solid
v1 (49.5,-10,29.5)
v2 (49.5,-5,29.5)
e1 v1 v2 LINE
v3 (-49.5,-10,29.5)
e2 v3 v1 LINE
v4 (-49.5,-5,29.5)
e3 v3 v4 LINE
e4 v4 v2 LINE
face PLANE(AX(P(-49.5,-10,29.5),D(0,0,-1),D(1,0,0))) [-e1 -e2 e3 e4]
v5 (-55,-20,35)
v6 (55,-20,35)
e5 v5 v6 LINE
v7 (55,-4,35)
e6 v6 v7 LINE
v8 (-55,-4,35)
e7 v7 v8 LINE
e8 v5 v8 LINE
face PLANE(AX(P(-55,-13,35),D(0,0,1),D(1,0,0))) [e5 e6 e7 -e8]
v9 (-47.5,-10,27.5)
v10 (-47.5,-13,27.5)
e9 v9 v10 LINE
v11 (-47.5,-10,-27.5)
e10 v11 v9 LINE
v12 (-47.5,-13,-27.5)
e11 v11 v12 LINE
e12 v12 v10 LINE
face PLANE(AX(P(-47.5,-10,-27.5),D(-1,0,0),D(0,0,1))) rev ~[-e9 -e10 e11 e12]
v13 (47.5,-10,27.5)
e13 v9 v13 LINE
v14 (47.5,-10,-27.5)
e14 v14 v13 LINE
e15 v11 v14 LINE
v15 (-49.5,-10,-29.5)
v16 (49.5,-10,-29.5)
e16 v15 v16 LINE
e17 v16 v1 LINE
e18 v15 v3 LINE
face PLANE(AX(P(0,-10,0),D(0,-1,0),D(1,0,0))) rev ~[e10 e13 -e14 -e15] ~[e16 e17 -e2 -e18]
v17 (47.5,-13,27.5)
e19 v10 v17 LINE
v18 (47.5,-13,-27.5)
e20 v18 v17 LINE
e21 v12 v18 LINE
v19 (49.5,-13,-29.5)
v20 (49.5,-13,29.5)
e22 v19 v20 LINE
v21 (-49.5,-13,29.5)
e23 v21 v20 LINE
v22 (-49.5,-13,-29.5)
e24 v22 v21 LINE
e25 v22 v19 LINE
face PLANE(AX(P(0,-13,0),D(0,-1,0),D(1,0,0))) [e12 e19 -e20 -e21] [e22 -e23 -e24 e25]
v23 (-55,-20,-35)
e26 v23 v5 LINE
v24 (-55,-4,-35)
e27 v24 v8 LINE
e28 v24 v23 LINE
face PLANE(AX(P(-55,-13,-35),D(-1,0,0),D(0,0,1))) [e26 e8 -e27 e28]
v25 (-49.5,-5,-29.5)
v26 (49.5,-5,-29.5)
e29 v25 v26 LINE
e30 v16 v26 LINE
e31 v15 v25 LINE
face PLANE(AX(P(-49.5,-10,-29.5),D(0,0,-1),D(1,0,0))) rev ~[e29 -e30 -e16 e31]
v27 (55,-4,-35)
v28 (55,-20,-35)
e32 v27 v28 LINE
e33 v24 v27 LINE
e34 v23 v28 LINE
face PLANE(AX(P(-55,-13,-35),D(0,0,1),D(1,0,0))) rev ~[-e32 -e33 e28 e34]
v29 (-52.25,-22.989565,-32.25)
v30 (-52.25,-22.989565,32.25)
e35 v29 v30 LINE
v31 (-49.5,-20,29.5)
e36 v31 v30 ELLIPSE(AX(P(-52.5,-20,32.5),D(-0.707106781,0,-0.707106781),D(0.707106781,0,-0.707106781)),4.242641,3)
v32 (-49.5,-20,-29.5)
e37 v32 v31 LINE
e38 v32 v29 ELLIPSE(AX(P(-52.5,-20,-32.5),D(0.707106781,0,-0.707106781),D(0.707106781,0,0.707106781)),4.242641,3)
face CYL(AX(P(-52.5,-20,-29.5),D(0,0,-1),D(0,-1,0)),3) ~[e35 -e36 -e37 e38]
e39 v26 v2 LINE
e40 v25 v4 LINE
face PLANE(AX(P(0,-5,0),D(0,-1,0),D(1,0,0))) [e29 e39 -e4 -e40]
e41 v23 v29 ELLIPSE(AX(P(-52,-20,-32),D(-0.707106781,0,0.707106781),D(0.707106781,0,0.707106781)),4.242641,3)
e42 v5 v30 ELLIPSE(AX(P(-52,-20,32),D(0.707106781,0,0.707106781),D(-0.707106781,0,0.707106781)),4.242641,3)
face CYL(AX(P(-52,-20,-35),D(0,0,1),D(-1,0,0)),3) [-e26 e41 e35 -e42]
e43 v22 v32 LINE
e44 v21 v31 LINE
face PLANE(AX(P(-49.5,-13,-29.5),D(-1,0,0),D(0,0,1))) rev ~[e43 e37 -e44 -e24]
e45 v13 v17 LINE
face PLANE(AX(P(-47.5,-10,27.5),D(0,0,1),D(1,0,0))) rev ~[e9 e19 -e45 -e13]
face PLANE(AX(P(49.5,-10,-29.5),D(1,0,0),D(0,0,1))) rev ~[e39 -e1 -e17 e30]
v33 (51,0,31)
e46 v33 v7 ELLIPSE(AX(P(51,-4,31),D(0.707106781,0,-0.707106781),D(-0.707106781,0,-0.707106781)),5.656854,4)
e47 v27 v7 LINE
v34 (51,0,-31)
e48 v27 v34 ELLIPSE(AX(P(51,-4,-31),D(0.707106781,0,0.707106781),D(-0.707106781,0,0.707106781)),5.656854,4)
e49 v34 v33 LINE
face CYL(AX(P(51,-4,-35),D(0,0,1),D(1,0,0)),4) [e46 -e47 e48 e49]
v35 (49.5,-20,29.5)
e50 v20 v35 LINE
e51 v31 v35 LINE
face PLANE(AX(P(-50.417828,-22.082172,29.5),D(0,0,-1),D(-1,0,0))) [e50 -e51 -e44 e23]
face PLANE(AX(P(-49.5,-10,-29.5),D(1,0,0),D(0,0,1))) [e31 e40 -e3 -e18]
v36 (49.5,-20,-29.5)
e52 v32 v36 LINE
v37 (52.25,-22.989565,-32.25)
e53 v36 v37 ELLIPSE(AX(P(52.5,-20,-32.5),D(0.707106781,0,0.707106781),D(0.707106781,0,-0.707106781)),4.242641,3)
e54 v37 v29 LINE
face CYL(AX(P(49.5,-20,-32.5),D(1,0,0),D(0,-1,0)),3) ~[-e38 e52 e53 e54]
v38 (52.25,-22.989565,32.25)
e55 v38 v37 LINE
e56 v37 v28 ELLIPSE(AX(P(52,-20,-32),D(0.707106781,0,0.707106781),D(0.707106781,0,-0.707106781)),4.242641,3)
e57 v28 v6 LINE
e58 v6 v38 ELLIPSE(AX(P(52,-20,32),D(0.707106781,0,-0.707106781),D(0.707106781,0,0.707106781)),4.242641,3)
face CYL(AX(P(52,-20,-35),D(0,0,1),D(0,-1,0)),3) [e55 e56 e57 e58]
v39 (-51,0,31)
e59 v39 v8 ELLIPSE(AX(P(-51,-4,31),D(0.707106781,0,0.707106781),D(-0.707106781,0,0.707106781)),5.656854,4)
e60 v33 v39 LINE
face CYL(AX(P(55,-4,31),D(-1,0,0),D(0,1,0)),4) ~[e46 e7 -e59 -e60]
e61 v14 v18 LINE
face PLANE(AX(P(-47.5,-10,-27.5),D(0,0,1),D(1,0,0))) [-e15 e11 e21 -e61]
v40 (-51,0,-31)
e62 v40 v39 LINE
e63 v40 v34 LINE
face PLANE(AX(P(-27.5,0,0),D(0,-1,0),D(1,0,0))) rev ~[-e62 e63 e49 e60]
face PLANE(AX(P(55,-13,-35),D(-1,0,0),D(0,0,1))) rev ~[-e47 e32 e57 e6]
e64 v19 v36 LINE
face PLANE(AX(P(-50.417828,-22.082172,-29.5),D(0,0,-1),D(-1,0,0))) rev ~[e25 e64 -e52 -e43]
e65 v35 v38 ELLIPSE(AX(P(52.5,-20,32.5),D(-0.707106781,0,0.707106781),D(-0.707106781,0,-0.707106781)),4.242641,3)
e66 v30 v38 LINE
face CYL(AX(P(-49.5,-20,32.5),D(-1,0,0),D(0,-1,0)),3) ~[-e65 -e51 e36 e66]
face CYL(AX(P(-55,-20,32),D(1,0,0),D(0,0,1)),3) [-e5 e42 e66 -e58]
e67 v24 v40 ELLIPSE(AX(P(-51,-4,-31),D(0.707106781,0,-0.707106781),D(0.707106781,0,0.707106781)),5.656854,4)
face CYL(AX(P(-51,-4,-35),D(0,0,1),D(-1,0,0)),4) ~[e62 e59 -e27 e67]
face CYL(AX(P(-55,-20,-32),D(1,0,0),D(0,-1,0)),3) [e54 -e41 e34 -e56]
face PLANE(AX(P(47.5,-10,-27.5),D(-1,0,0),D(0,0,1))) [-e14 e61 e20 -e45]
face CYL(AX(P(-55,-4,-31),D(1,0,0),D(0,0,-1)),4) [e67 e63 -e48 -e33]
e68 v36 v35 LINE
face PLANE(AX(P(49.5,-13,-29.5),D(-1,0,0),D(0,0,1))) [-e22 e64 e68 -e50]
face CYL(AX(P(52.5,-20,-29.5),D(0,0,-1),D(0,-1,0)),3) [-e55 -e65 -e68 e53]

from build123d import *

# Parameters (mm, degrees)
F0_W          = 55
F0_H          = 70
F1_DEPTH      = 10
F2_W          = 99
F2_H          = 59
F3_DEPTH      = 5
F4_W          = 110
F4_H          = 70
F4_W_2        = 99
F4_H_2        = 59
F4_W_3        = 95
F4_H_3        = 55
F5_DEPTH      = 3
F6_W          = 110
F6_H          = 70
F6_W_2        = 99
F6_H_2        = 59
F7_DEPTH      = 10
F8_R          = 4
F9_R          = 3
F10_T1_DEPTH  = 59
F10_T3_DEPTH  = 99
F10_T9_DEPTH  = 106.5
F10_T13_DEPTH = 66.5
F10_T20_DEPTH = 66.5
F10_T24_DEPTH = 106.5
F10_T31_DEPTH = 106.5
F10_T35_DEPTH = 66.5
F10_T42_DEPTH = 106.5
F10_T46_DEPTH = 66.5


# Not quite as in the source:
# - a fillet or chamfer that OpenCascade refuses, or shapes differently, is made with other operations: its cross-section is extruded or revolved along the edge and cut away or added


with BuildPart() as f1:
    # F0 (on Front) → F1 (new body)
    with BuildSketch(Plane.XZ):
        with Locations((-27.5, 0)):
            Rectangle(F0_W, F0_H)
        with Locations((27.5, 0)):
            Rectangle(F0_W, F0_H)
    extrude(amount=F1_DEPTH)

    # F2 (on face) → F3 (cut)
    with BuildSketch(Plane.XZ.offset(10)):
        Rectangle(F2_W, F2_H)
    extrude(amount=-F3_DEPTH, mode=Mode.SUBTRACT)

    # F4 (on face) → F5 (join)
    with BuildSketch(Plane.XZ.offset(10)):
        Rectangle(F4_W, F4_H)
        Rectangle(F4_W_2, F4_H_2, mode=Mode.SUBTRACT)
        Rectangle(F4_W_2, F4_H_2)
        Rectangle(F4_W_3, F4_H_3, mode=Mode.SUBTRACT)
    extrude(amount=F5_DEPTH)

    # F6 (on face) → F7 (join)
    with BuildSketch(Plane.XZ.offset(13)):
        Rectangle(F6_W, F6_H)
        Rectangle(F6_W_2, F6_H_2, mode=Mode.SUBTRACT)
    extrude(amount=F7_DEPTH)

    # F8
    f8_edges = [f1.edges().sort_by_distance(p)[0] for p in [
        (0, 0, 35),
        (-55, 0, 0),
        (55, 0, 0),
        (0, 0, -35),
    ]]
    fillet(f8_edges, radius=F8_R)

    # F9
    f9_edges = [f1.edges().sort_by_distance(p)[0] for p in [
        (-55, -23, 0),
        (0, -23, 35),
        (0, -23, -35),
        (55, -23, 0),
    ]]
    fillet(f9_edges, radius=F9_R)

    # F10: fillet of radius 3 on 4 edges, made by hand

    # F10_s2 → F10_t1 (cut)
    with BuildSketch(Plane.XY.offset(-29.5)):
        with BuildLine():
            ThreePointArc((-52.5, -23), (-50.3786796564, -22.1213203436), (-49.5, -20))
            Line((-49.5, -20), (-49.5, -23))
            Line((-49.5, -23), (-52.5, -23))
        make_face()
        with BuildLine():
            ThreePointArc((52.5, -23), (50.3786796564, -22.1213203436), (49.5, -20))
            Line((49.5, -20), (49.5, -23))
            Line((49.5, -23), (52.5, -23))
        make_face()
    extrude(amount=F10_T1_DEPTH, mode=Mode.SUBTRACT)

    # F10_s4 → F10_t3 (cut)
    with BuildSketch(Plane.YZ.offset(-49.5)):
        with BuildLine():
            ThreePointArc((-23, 32.5), (-22.1213203436, 30.3786796564), (-20, 29.5))
            Line((-20, 29.5), (-23, 29.5))
            Line((-23, 29.5), (-23, 32.5))
        make_face()
        with BuildLine():
            ThreePointArc((-23, -32.5), (-22.1213203436, -30.3786796564), (-20, -29.5))
            Line((-20, -29.5), (-23, -29.5))
            Line((-23, -29.5), (-23, -32.5))
        make_face()
    extrude(amount=F10_T3_DEPTH, mode=Mode.SUBTRACT)


with BuildPart() as f10_tool7:
    # F10_s8 → F10_t9 (new body)
    with BuildSketch(Plane.YZ.offset(49.5)):
        with BuildLine():
            ThreePointArc((-23, -32.5), (-22.1213203436, -30.3786796564), (-20, -29.5))
            Line((-20, -29.5), (-23, -29.5))
            Line((-23, -29.5), (-23, -32.5))
        make_face()
    extrude(amount=-F10_T9_DEPTH)

    split(bisect_by=Plane.YZ.offset(-49.5), keep=Keep.BOTTOM)


with BuildPart() as f10_tool11:
    # F10_s12 → F10_t13 (new body)
    with BuildSketch(Plane.XY.offset(-37)):
        with BuildLine():
            ThreePointArc((-52.5, -23), (-50.3786796564, -22.1213203436), (-49.5, -20))
            Line((-49.5, -20), (-49.5, -23))
            Line((-49.5, -23), (-52.5, -23))
        make_face()
    extrude(amount=F10_T13_DEPTH)

    split(bisect_by=Plane.XY.offset(-29.5), keep=Keep.BOTTOM)


with BuildPart() as f10_tool7_1:
    add(f10_tool7.part)

    # F10_t15: intersect F10_tool11
    add(f10_tool11.part, mode=Mode.INTERSECT)


with BuildPart() as f1_1:
    add(f1.part)

    # F10_t5: cut F10_tool7
    add(f10_tool7_1.part, mode=Mode.SUBTRACT)


with BuildPart() as f10_tool18:
    # F10_s19 → F10_t20 (new body)
    with BuildSketch(Plane.XY.offset(-29.5)):
        with BuildLine():
            ThreePointArc((-52.5, -23), (-50.3786796564, -22.1213203436), (-49.5, -20))
            Line((-49.5, -20), (-49.5, -23))
            Line((-49.5, -23), (-52.5, -23))
        make_face()
    extrude(amount=F10_T20_DEPTH)

    split(bisect_by=Plane.XY.offset(29.5), keep=Keep.TOP)


with BuildPart() as f10_tool22:
    # F10_s23 → F10_t24 (new body)
    with BuildSketch(Plane.YZ.offset(-57)):
        with BuildLine():
            ThreePointArc((-23, 32.5), (-22.1213203436, 30.3786796564), (-20, 29.5))
            Line((-20, 29.5), (-23, 29.5))
            Line((-23, 29.5), (-23, 32.5))
        make_face()
    extrude(amount=F10_T24_DEPTH)

    split(bisect_by=Plane.YZ.offset(-49.5), keep=Keep.BOTTOM)


with BuildPart() as f10_tool18_1:
    add(f10_tool18.part)

    # F10_t26: intersect F10_tool22
    add(f10_tool22.part, mode=Mode.INTERSECT)


with BuildPart() as f1_2:
    add(f1_1.part)

    # F10_t16: cut F10_tool18
    add(f10_tool18_1.part, mode=Mode.SUBTRACT)


with BuildPart() as f10_tool29:
    # F10_s30 → F10_t31 (new body)
    with BuildSketch(Plane.YZ.offset(-49.5)):
        with BuildLine():
            ThreePointArc((-23, 32.5), (-22.1213203436, 30.3786796564), (-20, 29.5))
            Line((-20, 29.5), (-23, 29.5))
            Line((-23, 29.5), (-23, 32.5))
        make_face()
    extrude(amount=F10_T31_DEPTH)

    split(bisect_by=Plane.YZ.offset(49.5), keep=Keep.TOP)


with BuildPart() as f10_tool33:
    # F10_s34 → F10_t35 (new body)
    with BuildSketch(Plane.XY.offset(37)):
        with BuildLine():
            ThreePointArc((52.5, -23), (50.3786796564, -22.1213203436), (49.5, -20))
            Line((49.5, -20), (49.5, -23))
            Line((49.5, -23), (52.5, -23))
        make_face()
    extrude(amount=-F10_T35_DEPTH)

    split(bisect_by=Plane.XY.offset(29.5), keep=Keep.TOP)


with BuildPart() as f10_tool29_1:
    add(f10_tool29.part)

    # F10_t37: intersect F10_tool33
    add(f10_tool33.part, mode=Mode.INTERSECT)


with BuildPart() as f1_3:
    add(f1_2.part)

    # F10_t27: cut F10_tool29
    add(f10_tool29_1.part, mode=Mode.SUBTRACT)


with BuildPart() as f10_tool40:
    # F10_s41 → F10_t42 (new body)
    with BuildSketch(Plane.YZ.offset(57)):
        with BuildLine():
            ThreePointArc((-23, -32.5), (-22.1213203436, -30.3786796564), (-20, -29.5))
            Line((-20, -29.5), (-23, -29.5))
            Line((-23, -29.5), (-23, -32.5))
        make_face()
    extrude(amount=-F10_T42_DEPTH)

    split(bisect_by=Plane.YZ.offset(49.5), keep=Keep.TOP)


with BuildPart() as f10_tool44:
    # F10_s45 → F10_t46 (new body)
    with BuildSketch(Plane.XY.offset(29.5)):
        with BuildLine():
            ThreePointArc((52.5, -23), (50.3786796564, -22.1213203436), (49.5, -20))
            Line((49.5, -20), (49.5, -23))
            Line((49.5, -23), (52.5, -23))
        make_face()
    extrude(amount=-F10_T46_DEPTH)

    split(bisect_by=Plane.XY.offset(-29.5), keep=Keep.BOTTOM)


with BuildPart() as f10_tool40_1:
    add(f10_tool40.part)

    # F10_t48: intersect F10_tool44
    add(f10_tool44.part, mode=Mode.INTERSECT)


with BuildPart() as f1_4:
    add(f1_3.part)

    # F10_t38: cut F10_tool40
    add(f10_tool40_1.part, mode=Mode.SUBTRACT)


solid = f1_4.part
